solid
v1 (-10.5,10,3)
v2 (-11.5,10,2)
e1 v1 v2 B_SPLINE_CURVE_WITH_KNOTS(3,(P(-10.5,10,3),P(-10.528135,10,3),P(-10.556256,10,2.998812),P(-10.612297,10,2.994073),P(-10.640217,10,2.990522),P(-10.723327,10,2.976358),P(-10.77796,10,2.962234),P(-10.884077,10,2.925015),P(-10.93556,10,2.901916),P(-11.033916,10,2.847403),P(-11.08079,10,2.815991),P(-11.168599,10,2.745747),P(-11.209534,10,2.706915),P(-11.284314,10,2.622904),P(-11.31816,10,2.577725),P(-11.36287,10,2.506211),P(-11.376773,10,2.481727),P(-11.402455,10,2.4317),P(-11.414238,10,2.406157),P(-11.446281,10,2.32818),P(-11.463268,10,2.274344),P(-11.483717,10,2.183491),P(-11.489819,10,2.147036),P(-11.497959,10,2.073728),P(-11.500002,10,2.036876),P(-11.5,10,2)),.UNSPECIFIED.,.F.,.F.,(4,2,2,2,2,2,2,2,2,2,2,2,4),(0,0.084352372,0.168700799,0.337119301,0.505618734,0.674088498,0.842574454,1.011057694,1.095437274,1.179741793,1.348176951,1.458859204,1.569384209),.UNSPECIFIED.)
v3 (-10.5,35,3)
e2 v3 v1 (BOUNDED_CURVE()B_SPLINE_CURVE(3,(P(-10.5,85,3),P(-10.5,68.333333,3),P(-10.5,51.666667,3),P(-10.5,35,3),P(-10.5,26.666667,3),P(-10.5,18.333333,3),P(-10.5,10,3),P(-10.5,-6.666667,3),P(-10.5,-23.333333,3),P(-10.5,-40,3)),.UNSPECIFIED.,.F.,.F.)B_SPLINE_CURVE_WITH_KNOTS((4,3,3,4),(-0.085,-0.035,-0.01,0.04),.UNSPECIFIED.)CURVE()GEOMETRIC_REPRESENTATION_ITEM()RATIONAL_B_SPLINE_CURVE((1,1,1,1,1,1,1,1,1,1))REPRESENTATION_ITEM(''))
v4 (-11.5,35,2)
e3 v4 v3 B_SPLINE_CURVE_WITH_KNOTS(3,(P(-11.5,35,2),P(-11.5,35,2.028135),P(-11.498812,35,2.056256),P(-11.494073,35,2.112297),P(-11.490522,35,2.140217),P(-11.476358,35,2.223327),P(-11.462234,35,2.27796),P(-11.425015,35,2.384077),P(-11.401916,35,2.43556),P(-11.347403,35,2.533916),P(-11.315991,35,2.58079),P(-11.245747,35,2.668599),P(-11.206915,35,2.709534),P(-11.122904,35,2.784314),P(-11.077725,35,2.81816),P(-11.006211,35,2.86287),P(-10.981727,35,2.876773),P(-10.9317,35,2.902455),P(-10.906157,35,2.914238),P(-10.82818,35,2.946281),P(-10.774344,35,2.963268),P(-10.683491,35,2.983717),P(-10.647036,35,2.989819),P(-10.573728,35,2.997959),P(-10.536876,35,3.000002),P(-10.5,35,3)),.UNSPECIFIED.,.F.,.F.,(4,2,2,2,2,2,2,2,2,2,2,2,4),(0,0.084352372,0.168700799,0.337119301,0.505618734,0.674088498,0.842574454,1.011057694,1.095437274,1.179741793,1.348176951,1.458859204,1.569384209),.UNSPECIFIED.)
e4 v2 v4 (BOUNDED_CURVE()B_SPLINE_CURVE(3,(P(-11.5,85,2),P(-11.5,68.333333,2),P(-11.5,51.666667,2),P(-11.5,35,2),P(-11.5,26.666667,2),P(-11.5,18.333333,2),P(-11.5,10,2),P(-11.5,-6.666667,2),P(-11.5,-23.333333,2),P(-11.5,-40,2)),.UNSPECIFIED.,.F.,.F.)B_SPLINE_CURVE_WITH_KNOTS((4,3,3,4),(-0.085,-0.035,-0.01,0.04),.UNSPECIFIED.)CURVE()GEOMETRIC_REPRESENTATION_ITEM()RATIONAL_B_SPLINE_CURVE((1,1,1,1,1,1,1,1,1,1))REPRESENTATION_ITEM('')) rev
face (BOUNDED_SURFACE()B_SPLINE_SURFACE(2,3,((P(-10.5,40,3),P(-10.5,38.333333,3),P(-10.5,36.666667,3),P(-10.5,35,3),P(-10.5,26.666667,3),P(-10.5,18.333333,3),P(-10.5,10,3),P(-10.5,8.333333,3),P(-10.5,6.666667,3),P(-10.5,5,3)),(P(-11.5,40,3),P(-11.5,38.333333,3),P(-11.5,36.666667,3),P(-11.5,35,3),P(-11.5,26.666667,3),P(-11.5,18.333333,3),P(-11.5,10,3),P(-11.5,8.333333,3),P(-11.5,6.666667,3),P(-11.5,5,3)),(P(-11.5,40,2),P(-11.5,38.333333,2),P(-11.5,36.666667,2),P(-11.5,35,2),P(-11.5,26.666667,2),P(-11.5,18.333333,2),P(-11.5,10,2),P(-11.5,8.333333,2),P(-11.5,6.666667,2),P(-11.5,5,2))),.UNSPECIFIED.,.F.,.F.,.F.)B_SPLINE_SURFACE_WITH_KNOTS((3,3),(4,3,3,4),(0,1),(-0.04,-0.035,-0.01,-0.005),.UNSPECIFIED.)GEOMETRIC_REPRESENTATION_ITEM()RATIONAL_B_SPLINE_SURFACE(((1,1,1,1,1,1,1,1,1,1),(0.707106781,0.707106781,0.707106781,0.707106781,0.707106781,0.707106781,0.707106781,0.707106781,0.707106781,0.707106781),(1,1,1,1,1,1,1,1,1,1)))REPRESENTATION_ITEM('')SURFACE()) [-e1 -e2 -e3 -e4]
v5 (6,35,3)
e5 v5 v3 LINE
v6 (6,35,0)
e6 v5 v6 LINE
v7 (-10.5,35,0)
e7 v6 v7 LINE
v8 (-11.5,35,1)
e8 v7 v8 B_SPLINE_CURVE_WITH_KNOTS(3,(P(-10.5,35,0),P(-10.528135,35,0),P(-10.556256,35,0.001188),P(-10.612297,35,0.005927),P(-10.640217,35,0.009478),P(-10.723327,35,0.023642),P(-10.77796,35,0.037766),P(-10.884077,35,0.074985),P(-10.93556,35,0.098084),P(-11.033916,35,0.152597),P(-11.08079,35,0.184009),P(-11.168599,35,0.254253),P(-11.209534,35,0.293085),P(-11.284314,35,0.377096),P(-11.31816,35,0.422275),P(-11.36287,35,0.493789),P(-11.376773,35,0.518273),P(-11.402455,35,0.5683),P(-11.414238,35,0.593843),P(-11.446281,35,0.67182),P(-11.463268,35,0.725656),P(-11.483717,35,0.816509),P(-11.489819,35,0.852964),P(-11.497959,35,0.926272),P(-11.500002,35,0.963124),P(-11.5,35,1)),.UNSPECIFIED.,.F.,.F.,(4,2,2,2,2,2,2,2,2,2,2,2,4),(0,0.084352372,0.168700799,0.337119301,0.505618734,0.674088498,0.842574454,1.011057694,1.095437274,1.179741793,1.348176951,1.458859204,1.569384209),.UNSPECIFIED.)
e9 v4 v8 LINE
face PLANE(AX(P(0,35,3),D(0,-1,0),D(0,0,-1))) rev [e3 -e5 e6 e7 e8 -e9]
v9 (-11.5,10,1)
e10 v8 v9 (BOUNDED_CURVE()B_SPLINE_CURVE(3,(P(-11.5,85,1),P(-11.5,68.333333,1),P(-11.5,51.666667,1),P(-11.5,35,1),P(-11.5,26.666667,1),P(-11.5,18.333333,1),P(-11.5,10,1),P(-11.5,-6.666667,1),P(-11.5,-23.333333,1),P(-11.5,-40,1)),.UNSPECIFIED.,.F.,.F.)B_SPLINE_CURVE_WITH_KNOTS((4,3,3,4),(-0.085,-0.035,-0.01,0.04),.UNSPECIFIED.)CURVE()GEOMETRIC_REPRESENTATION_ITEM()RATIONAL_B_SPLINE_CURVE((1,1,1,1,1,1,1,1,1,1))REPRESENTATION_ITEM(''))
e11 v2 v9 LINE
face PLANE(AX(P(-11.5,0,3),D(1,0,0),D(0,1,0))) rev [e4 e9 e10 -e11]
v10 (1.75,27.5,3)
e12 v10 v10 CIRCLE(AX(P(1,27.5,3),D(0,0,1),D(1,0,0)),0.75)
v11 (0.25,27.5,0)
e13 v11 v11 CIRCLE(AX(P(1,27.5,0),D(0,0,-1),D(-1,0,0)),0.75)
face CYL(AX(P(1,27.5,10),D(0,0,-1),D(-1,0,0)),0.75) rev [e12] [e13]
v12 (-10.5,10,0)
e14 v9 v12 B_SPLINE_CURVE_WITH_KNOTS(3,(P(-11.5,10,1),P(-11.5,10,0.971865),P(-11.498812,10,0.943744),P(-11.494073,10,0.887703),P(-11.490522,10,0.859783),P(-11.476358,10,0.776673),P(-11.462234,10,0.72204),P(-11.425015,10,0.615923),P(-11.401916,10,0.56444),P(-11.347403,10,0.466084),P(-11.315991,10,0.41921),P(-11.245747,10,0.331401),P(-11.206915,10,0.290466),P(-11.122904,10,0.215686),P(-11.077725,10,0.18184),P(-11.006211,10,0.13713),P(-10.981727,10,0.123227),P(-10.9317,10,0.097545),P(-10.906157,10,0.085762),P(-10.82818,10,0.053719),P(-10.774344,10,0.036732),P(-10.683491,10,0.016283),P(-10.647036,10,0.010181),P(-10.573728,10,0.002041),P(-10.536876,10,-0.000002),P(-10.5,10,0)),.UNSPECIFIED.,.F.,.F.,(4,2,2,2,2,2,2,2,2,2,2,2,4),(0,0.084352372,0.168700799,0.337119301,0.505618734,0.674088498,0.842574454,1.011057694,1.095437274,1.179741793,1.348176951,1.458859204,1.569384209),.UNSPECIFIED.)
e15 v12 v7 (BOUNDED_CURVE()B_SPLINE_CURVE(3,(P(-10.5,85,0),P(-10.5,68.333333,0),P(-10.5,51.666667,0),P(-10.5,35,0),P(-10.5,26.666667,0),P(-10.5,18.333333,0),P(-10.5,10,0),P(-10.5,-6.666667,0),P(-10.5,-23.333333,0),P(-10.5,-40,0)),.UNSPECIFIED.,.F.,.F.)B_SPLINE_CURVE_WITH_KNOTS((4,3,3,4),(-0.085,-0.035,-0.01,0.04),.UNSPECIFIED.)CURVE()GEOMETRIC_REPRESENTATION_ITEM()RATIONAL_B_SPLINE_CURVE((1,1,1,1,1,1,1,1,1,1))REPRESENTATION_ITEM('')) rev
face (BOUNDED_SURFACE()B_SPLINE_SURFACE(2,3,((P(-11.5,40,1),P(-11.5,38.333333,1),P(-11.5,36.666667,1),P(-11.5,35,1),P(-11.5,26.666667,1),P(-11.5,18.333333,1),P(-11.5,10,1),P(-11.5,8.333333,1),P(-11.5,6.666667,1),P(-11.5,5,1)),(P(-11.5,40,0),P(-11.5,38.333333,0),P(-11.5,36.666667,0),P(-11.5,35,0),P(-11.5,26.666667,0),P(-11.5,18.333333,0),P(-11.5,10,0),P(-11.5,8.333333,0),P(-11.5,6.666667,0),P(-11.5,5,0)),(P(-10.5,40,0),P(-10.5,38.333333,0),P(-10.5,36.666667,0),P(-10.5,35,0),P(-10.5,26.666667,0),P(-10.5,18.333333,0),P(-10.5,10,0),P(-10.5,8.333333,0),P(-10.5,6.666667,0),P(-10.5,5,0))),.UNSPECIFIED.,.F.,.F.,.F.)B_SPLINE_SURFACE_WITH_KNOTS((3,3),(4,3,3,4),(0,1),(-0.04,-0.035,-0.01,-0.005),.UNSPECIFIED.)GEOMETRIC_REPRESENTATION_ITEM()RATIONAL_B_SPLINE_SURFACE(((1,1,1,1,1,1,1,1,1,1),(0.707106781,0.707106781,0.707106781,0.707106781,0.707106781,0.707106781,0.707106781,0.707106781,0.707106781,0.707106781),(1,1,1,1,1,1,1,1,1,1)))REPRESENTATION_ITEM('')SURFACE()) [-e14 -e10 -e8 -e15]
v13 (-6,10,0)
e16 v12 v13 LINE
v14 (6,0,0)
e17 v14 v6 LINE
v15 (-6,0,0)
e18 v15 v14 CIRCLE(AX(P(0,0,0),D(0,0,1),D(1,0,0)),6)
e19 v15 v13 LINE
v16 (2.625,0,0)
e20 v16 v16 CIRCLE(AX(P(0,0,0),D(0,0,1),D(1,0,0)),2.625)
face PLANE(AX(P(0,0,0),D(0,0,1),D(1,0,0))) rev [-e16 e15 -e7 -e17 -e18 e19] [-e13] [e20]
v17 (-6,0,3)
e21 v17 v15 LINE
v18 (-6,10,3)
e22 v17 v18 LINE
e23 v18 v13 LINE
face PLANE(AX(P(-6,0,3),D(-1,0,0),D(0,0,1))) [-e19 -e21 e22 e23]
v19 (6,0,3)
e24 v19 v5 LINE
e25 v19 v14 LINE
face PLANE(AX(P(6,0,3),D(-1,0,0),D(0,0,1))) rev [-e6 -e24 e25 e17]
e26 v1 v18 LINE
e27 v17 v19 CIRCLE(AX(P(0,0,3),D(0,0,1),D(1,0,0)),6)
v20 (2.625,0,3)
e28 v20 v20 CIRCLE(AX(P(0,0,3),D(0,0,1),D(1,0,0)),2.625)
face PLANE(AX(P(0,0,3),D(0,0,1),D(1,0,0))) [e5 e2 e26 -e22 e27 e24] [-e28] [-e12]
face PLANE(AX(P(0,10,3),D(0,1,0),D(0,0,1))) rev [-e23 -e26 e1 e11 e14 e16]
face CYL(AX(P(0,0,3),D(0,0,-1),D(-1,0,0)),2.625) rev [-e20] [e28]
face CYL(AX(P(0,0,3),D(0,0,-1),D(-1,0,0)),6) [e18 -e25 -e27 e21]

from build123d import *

# Parameters (mm, degrees)
SKETCH1_R           = 2.625
BOSS_EXTRUDE1_DEPTH = 3
VARFILLET1_R        = 1
SKETCH3_R           = 0.75
CUT_EXTRUDE1_DEPTH  = 10


with BuildPart() as part:
    # Sketch1 → Boss-Extrude1 (new body)
    with BuildSketch(Plane.XY):
        with BuildLine():
            Line((-6, 10), (-6, 0))
            ThreePointArc((-6, 0), (0, -6), (6, 0))
            Line((6, 0), (6, 35))
            Line((6, 35), (-11.5, 35))
            Line((-11.5, 35), (-11.5, 10))
            Line((-11.5, 10), (-6, 10))
        make_face()
        Circle(SKETCH1_R, mode=Mode.SUBTRACT)
    extrude(amount=BOSS_EXTRUDE1_DEPTH)

    # VarFillet1
    varfillet1_edges = [part.edges().sort_by_distance(p)[0] for p in [
        (-11.5, 22.5, 0),
        (-11.5, 22.5, 3),
    ]]
    fillet(varfillet1_edges, radius=VARFILLET1_R)

    # Sketch3 → Cut-Extrude1 (cut)
    with BuildSketch(Plane(origin=(0, 0, 0), x_dir=(-1, 0, 0), z_dir=(0, 0, -1))):
        with Locations((-1, 27.5)):
            Circle(SKETCH3_R)
    extrude(amount=-CUT_EXTRUDE1_DEPTH, mode=Mode.SUBTRACT)


solid = part.part
